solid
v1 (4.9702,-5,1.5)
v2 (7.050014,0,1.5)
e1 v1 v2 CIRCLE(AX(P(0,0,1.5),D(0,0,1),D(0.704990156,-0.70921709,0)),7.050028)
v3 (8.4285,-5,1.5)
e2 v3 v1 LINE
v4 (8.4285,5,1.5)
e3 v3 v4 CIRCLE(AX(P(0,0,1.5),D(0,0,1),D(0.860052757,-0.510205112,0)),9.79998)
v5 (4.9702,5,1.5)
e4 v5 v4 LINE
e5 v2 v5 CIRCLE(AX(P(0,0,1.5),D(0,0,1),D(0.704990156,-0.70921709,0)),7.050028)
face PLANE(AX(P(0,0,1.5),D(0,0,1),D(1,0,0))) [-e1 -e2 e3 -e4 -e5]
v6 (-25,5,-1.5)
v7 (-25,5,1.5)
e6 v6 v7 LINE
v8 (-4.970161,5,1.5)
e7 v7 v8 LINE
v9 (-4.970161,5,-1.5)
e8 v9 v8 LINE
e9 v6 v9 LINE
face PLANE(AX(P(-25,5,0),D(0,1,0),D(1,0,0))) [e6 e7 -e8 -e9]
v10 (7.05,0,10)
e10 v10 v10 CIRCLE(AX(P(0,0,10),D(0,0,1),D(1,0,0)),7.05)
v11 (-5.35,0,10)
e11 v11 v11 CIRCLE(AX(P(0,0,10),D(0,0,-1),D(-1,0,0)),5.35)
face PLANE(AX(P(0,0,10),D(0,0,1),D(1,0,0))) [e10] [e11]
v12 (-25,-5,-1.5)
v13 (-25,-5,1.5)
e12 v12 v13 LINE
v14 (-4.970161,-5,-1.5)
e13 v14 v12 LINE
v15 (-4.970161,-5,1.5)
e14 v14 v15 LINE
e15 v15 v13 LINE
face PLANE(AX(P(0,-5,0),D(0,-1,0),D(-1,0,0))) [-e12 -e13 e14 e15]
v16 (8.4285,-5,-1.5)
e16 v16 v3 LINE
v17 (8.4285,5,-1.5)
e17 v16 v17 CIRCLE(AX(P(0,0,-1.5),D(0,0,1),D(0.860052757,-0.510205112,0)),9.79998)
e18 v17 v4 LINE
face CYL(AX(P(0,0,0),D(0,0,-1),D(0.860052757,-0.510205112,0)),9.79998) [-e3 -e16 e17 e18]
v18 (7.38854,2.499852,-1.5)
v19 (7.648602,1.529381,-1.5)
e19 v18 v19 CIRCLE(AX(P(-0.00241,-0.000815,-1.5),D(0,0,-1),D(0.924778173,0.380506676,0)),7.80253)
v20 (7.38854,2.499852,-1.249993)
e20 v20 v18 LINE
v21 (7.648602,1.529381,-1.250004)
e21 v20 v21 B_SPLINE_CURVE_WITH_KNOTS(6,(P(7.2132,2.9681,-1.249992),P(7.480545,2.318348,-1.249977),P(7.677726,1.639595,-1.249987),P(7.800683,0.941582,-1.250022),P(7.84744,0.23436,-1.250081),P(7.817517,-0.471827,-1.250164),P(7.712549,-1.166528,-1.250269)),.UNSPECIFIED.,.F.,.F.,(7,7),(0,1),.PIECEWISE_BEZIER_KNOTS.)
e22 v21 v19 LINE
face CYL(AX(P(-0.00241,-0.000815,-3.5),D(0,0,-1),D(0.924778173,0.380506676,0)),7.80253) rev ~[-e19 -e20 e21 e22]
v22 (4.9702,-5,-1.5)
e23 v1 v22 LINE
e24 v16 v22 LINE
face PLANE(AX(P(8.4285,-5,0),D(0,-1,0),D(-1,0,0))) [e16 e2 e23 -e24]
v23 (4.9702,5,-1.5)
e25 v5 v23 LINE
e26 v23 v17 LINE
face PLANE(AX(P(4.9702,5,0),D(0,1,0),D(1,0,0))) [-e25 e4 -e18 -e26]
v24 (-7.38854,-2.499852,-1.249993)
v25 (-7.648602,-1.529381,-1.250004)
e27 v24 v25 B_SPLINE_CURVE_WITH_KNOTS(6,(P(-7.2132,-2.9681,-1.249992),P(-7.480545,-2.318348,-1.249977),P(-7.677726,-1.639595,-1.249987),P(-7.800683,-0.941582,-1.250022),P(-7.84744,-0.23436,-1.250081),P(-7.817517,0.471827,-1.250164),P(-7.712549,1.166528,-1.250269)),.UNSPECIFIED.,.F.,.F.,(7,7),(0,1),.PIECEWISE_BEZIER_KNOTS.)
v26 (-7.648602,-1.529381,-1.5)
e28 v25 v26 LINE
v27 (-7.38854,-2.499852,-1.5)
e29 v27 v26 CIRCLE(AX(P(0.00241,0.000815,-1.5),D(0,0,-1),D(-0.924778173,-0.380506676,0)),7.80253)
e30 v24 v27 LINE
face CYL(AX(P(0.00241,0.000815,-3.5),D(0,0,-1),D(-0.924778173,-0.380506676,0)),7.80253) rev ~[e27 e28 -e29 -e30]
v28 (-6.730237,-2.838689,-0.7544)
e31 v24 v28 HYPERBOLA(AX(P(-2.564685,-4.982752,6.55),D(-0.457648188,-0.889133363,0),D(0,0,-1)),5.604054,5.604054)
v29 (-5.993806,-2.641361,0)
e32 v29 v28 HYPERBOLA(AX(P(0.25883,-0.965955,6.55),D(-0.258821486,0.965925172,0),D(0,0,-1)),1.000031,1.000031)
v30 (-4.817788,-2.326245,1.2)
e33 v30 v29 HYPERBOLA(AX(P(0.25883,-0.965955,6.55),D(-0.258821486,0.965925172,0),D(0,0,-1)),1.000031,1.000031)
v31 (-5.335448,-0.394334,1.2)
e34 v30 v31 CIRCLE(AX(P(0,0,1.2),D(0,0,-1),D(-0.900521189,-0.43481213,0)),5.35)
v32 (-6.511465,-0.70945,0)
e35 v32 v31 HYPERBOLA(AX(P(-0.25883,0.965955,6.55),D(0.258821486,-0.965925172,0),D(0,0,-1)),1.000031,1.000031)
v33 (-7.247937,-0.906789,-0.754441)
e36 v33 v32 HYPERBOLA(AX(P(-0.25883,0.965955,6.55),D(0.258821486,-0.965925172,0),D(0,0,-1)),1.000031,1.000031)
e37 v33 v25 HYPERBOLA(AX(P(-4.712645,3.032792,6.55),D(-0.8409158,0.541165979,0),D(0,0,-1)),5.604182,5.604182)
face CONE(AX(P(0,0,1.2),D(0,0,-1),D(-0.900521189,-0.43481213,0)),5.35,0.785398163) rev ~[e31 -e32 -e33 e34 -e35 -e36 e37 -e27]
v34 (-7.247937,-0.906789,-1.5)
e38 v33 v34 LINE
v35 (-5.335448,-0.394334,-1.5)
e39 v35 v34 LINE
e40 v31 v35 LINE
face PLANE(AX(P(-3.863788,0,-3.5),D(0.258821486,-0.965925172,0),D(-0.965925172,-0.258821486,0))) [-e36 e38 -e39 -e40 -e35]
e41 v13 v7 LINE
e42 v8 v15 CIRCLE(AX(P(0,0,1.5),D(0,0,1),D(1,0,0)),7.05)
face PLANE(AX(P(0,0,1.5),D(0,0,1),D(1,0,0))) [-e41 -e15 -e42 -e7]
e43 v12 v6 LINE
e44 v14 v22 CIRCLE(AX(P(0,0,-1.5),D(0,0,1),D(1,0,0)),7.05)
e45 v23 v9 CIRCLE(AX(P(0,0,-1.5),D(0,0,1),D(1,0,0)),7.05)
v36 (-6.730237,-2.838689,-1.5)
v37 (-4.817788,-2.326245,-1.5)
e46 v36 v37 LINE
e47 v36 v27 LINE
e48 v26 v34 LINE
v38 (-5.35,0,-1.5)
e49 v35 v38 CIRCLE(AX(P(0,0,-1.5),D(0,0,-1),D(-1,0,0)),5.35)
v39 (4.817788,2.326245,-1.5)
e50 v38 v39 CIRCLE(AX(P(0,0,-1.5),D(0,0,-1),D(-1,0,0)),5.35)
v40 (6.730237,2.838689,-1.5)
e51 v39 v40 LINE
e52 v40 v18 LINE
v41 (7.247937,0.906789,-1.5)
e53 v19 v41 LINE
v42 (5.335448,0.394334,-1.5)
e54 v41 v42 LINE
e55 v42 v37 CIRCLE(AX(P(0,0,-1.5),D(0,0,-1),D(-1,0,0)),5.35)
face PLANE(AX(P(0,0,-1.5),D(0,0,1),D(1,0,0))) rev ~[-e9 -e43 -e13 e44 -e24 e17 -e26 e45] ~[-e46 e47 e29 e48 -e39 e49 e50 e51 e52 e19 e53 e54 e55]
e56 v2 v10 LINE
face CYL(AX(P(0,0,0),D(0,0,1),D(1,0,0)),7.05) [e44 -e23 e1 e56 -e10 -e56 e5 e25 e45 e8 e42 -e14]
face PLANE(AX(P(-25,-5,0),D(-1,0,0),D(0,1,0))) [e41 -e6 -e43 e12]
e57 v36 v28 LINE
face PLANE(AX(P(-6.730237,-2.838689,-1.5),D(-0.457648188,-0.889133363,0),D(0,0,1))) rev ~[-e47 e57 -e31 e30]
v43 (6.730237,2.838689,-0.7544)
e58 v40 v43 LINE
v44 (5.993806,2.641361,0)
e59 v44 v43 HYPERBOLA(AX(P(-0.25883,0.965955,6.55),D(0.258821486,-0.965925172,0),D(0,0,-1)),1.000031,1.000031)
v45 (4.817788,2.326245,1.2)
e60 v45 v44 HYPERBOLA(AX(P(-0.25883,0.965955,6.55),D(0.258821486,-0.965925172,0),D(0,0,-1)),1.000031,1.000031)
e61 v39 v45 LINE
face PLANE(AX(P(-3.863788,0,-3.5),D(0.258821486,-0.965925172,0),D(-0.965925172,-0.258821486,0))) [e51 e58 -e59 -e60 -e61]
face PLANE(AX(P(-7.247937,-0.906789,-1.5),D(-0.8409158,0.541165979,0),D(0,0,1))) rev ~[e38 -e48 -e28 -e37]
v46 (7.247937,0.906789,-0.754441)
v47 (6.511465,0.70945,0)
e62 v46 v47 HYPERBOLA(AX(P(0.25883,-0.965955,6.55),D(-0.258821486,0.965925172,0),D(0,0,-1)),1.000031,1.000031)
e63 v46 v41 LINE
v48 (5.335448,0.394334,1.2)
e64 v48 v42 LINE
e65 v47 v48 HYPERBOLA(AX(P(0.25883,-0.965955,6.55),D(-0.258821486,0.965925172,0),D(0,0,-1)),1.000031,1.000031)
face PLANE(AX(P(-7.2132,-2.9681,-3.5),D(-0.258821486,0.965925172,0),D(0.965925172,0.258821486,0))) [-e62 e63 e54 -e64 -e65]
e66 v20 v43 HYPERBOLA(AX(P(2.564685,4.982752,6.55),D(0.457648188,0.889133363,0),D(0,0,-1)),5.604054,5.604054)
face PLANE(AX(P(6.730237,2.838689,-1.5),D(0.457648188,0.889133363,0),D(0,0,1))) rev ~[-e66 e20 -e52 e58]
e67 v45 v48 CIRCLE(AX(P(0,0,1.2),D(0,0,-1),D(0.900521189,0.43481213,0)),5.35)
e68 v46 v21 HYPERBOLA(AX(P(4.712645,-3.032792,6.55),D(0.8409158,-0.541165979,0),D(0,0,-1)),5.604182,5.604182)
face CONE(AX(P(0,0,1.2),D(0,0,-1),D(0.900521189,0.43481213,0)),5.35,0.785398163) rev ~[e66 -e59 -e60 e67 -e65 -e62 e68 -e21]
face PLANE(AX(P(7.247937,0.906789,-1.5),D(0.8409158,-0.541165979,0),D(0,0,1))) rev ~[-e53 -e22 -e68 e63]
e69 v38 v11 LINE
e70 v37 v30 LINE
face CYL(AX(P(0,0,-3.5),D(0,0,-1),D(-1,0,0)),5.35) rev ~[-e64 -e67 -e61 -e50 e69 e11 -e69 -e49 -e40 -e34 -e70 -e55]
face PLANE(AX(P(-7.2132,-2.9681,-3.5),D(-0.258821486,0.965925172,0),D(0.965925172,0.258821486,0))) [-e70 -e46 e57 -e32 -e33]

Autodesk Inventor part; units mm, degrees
sketch "スケッチ1" plane through (0, 0, 0) normal (0, 0, 1) x (1, 0, 0)
  circle A0 centre (0, 0) radius 5.25
  circle A1 centre (0, 0) radius 7.05
  dimension "d0" = 10.5
  dimension "d1" = 14.1
extrude "押し出し1" add sketch "スケッチ1" along normal blind 10 and the other way blind 3.5 contours A0 | A1
sketch "スケッチ2" plane through (0, 0, 0) normal (0, 0, 1) x (1, 0, 0)
  line L0 (-25, 5) -> (0, 5)
  line L1 (0, 5) -> (0, -5)
  line L2 (0, -5) -> (-25, -5)
  line L3 (-25, -5) -> (-25, 5)
  point P0 (0, 0)
  dimension "d4" = 25
  dimension "d5" = 5
  dimension "d6" = 10
extrude "押し出し2" add sketch "スケッチ2" along normal mid plane 3
sketch "スケッチ5" plane through (0, 0, -3.5) normal (0, 0, -1) x (-1, 0, 0)
  circle A0 centre (0, 0) radius 5.35
  dimension "d21" = 10.7
extrude "押し出し5" cut sketch "スケッチ5" against normal through all
sketch "スケッチ9" plane through (0, 0, 0) normal (0, 0, 1) x (1, 0, 0)
  line L0 (8.4285, -5) -> (-7.6033, -5)
  line L1 (-7.6033, 5) -> (8.4285, 5)
  arc A0 (4.9702, -5) -> (4.9702, 5) centre (0, 0) ccw
  arc A1 (-4.9702, 5) -> (-4.9702, -5) centre (0, 0) ccw
  arc A2 (8.4285, -5) -> (8.4285, 5) centre (0, 0) ccw
  arc A3 (-7.6033, 5) -> (-7.6033, -5) centre (0, 0) ccw
  dimension "d74" = 5
  dimension "d75" = 5
  dimension "d79" = 9.8
extrude "押し出し9" add sketch "スケッチ9" along normal mid plane 3 contours L0 A0 L1 A2
sketch "スケッチ6" plane through (0, 0, -3.5) normal (0, 0, -1) x (-1, 0, 0)
  line L0 (7.2132, -2.9681) -> (-7.7309, 1.0362)
  line L1 (-7.2132, 2.9681) -> (7.7309, -1.0362)
  line L2 (11.6181, 0) -> (-15.1574, 0) projected
  arc A0 (7.2132, -2.9681) -> (7.7309, -1.0362) centre (0, 0) ccw
  arc A1 (-7.2132, 2.9681) -> (-7.7309, 1.0362) centre (0, 0) ccw
  point P0 (-11.3323, 4.0718)
  dimension "d24" = 1
  dimension "d43" = 15
  dimension "d64" = 1
  dimension "d65" = 7.8
  dimension "d66" = 7.8
extrude "押し出し6" cut sketch "スケッチ6" against normal blind 3.5
move faces "移動4" translate (0, 0, 2) faces at (5.6485, 3.107, -3.5) (-3.1586, -5.6105, -3.5)
ref_plane "作業平面1" through (0, 0, 0) normal (-0.258819, 0.9659258, 0) x (0, 0, 1)
chamfer "面取り1" distance 0.5 angle 45 4 edges at (-7.7309, -1.0362, -0.75) (7.7309, 1.0362, -0.75) (7.2132, 2.9681, -0.75) (-7.2132, -2.9681, -0.75)
chamfer "面取り2" distance 1.2 angle 45 2 edges at (5.1677, 1.3847, 0) (-5.1677, -1.3847, 0)
move faces "移動5" translate (0, 0, -1.25) faces at (-6.7087, -1.8554, 0) (6.7087, 1.8554, 0)
properties part number "HbThumbProximalPhalanxBase01" material "ABS プラスチック"
